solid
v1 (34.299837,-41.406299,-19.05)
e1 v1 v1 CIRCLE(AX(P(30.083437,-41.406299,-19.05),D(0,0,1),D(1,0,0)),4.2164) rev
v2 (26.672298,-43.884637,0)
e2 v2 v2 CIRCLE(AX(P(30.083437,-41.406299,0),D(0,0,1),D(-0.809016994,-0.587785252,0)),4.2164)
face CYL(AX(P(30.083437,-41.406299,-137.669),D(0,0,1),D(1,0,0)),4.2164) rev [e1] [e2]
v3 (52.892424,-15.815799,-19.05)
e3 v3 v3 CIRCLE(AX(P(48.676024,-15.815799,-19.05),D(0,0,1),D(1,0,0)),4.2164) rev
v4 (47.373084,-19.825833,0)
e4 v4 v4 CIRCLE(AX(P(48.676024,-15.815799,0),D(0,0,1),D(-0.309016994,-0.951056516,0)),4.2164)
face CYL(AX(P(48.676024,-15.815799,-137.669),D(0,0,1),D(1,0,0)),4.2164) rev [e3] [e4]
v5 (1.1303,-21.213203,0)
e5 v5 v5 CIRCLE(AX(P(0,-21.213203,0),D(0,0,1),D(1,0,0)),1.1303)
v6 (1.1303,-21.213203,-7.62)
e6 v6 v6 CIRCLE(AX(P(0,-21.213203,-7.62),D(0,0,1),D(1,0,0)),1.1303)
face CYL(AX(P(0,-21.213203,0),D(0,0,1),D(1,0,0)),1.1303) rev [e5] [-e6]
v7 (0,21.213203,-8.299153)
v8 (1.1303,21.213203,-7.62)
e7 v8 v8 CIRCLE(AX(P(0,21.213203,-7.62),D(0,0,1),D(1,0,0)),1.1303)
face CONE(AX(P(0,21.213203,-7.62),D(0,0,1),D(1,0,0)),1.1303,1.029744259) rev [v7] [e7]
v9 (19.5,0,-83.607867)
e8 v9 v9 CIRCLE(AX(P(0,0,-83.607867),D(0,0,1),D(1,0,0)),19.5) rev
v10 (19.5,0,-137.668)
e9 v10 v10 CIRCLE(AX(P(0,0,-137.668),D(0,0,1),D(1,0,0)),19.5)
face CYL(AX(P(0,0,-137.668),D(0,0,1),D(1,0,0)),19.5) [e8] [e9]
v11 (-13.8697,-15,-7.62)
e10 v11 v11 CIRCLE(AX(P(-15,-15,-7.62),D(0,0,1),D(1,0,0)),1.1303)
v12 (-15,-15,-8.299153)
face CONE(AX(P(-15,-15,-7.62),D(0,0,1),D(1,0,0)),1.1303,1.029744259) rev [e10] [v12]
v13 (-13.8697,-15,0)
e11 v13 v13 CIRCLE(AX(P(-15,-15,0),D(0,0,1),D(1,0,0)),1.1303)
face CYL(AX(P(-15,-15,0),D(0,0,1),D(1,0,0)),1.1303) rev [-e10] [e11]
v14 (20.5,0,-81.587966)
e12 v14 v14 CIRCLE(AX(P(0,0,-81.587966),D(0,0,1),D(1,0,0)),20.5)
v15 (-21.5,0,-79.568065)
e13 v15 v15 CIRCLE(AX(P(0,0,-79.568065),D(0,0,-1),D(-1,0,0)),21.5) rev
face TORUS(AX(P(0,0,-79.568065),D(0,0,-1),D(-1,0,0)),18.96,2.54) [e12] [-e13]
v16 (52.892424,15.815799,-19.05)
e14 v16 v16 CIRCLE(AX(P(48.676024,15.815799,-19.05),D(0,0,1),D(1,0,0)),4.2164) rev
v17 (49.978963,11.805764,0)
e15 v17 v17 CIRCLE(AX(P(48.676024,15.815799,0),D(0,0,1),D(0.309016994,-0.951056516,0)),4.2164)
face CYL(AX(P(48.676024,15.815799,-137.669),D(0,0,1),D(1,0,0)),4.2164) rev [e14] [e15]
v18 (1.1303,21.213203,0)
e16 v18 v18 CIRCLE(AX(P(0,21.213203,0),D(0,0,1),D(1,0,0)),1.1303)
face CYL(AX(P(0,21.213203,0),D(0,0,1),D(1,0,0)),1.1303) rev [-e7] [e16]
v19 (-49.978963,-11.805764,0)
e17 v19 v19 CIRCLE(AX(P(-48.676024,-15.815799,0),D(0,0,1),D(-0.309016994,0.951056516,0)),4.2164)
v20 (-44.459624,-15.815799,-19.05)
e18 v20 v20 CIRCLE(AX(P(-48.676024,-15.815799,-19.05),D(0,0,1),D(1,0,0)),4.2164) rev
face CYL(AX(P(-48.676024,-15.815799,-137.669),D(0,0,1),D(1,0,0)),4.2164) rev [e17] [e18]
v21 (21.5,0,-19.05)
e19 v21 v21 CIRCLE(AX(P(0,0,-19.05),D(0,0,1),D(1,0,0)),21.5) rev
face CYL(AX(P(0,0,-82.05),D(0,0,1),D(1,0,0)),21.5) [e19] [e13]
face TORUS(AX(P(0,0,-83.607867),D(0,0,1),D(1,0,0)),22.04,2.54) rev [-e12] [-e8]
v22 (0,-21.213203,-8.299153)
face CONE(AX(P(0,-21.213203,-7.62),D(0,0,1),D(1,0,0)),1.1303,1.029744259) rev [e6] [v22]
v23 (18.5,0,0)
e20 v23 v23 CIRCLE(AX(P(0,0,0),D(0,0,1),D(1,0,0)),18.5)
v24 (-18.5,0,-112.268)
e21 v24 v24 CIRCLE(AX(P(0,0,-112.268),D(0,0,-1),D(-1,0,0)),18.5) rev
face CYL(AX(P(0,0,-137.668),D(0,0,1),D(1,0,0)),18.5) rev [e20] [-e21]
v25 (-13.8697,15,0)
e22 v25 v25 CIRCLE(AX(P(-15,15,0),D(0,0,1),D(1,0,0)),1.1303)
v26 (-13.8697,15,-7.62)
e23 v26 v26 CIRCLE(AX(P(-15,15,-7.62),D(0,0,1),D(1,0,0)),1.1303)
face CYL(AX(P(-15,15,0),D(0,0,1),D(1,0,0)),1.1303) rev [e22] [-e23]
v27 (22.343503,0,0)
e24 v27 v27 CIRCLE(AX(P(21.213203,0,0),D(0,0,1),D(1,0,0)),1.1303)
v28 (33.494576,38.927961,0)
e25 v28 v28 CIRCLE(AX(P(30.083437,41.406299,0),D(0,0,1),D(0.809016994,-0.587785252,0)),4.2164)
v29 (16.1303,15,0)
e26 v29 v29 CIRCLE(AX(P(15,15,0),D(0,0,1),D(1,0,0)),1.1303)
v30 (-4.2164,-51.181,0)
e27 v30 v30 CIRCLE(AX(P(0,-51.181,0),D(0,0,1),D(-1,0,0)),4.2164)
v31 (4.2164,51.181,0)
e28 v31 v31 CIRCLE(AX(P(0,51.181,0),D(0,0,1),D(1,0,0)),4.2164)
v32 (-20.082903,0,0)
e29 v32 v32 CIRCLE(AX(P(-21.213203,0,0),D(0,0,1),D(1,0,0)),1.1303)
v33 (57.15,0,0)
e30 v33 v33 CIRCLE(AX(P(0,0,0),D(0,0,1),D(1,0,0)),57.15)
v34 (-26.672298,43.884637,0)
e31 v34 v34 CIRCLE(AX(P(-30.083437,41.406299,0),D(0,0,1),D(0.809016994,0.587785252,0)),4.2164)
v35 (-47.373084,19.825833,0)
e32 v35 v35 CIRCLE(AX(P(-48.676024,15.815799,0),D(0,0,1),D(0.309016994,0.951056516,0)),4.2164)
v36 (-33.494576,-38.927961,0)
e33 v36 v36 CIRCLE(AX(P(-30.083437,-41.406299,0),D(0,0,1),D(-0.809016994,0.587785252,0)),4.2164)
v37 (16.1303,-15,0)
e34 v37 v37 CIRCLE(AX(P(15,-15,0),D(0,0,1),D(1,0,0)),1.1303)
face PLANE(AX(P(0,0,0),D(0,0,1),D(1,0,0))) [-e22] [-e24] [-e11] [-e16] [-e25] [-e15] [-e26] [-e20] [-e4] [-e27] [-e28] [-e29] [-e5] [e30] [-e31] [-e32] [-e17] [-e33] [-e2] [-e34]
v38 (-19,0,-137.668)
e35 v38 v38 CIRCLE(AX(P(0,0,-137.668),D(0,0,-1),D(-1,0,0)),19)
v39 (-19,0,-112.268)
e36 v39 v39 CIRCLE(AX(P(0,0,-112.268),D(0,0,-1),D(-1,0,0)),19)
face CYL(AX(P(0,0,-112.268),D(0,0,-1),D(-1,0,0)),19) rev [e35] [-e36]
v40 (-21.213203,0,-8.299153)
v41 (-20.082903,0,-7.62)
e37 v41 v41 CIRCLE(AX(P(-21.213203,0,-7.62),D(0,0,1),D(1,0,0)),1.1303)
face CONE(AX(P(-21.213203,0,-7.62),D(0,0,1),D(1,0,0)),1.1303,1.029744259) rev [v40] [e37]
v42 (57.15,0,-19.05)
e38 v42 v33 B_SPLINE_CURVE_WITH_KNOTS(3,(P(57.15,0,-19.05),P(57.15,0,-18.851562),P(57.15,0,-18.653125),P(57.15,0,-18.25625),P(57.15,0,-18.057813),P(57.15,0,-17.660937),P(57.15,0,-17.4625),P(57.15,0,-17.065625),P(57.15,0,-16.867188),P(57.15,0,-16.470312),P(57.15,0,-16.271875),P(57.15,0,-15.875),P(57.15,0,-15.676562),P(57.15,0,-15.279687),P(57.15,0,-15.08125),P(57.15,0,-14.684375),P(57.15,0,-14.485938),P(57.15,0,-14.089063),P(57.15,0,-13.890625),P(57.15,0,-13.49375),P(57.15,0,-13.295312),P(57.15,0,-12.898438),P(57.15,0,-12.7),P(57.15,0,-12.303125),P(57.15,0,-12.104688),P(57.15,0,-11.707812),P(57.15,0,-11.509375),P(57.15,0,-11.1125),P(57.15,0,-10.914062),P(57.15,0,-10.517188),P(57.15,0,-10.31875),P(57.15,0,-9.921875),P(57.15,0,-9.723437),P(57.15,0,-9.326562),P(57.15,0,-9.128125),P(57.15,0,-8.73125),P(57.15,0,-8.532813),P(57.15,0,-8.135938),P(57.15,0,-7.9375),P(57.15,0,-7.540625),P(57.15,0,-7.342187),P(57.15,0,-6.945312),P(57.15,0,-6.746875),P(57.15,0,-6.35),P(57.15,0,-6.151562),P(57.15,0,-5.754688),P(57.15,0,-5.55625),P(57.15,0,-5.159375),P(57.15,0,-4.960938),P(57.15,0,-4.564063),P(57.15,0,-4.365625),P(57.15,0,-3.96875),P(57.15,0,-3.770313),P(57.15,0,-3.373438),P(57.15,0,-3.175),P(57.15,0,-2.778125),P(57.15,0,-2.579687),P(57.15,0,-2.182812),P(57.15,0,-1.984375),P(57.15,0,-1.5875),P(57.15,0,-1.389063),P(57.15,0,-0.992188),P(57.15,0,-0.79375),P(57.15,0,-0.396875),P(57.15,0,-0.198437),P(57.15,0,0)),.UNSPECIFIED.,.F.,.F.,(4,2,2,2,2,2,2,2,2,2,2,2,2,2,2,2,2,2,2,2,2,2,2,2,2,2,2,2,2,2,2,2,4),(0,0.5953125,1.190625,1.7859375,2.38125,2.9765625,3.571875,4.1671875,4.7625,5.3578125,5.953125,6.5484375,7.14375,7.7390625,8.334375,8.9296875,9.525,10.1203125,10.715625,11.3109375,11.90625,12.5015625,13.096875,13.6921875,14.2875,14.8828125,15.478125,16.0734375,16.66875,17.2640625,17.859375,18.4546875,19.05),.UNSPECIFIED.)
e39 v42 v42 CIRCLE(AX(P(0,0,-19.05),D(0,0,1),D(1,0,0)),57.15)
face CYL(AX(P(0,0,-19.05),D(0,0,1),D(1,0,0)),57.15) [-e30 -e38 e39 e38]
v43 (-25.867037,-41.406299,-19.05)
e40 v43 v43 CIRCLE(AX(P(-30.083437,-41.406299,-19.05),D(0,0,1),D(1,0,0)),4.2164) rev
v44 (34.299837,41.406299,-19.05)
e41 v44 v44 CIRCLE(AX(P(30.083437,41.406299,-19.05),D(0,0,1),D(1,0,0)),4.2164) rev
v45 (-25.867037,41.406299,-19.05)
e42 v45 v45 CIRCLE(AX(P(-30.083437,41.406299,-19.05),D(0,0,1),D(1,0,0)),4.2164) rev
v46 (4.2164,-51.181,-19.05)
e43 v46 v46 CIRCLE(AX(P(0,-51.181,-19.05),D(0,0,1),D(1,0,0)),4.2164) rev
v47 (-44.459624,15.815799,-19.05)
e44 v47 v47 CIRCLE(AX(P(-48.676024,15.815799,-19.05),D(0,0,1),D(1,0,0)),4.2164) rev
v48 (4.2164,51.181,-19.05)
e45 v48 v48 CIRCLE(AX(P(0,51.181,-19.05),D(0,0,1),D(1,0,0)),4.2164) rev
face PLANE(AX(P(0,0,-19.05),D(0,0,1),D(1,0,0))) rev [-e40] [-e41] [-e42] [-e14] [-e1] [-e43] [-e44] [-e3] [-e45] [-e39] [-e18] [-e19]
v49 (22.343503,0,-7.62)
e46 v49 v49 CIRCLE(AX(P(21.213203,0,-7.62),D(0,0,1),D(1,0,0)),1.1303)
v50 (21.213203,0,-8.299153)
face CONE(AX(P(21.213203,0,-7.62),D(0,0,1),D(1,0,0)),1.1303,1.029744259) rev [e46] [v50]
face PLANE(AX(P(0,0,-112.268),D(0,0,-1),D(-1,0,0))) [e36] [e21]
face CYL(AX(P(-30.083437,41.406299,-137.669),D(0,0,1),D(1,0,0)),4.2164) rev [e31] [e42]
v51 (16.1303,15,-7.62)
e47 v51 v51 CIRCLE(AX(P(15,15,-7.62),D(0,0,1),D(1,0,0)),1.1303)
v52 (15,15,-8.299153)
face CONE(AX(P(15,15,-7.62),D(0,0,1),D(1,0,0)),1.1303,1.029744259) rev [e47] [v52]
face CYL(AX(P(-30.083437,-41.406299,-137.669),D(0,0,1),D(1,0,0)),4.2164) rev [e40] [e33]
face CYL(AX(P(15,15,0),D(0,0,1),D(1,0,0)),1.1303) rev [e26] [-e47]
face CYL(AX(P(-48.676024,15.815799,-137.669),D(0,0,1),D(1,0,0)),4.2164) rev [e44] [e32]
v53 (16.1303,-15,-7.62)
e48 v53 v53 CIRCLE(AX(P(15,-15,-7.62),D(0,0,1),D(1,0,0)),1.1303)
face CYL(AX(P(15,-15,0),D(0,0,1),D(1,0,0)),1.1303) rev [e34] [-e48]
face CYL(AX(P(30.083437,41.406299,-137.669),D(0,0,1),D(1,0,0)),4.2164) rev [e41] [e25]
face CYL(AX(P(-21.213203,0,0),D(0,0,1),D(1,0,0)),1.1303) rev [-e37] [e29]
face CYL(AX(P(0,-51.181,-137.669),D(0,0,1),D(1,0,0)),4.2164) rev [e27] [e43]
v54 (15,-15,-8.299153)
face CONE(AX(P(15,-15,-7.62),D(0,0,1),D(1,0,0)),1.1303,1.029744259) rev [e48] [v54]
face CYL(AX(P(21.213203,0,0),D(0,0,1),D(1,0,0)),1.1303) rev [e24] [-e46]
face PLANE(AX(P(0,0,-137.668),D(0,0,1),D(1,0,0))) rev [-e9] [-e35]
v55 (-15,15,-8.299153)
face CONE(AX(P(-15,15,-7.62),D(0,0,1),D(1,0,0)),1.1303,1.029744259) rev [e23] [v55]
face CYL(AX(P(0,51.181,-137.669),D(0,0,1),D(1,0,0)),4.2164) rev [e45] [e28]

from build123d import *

# Parameters (mm, degrees)
SKETCH1_R                 = 19.5
SKETCH1_R_2               = 18.5
EXTRUDE1_DEPTH            = 137.668
SKETCH4_R                 = 57.15
SKETCH4_R_2               = 19.5
EXTRUDE2_DEPTH            = 19.05
CUT_EXTRUDE1_REACH        = 161.639
SKETCH5_R                 = 4.2164
CIRPATTERN1_COUNT         = 10
F_4_40_TAPPED_HOLE2_D     = 2.2606
F_4_40_TAPPED_HOLE2_DEPTH = 7.62
F_4_40_TAPPED_HOLE2_TIP   = 0.679152758
SKETCH10_R                = 19
EXTRUDE3_DEPTH            = 25.4
EXTRUDE4_START            = 63
SKETCH12_R                = 21.5
SKETCH12_R_2              = 19
EXTRUDE4_DEPTH            = 63
FILLET1_R                 = 2.54
FILLET2_R                 = 2.54


with BuildPart() as part:
    # Sketch1 → Extrude1 (new body)
    with BuildSketch(Plane.XY):
        Circle(SKETCH1_R)
        Circle(SKETCH1_R_2, mode=Mode.SUBTRACT)
    extrude(amount=-EXTRUDE1_DEPTH)

    # Sketch4 → Extrude2 (add)
    with BuildSketch(Plane.XY):
        Circle(SKETCH4_R)
        Circle(SKETCH4_R_2, mode=Mode.SUBTRACT)
    extrude(amount=-EXTRUDE2_DEPTH)

    # Sketch5 → Cut-Extrude1 (cut, up to next)
    with BuildSketch(Plane.XY, mode=Mode.PRIVATE) as cut_extrude1_sk1:
        with Locations((0, 51.181)):
            Circle(SKETCH5_R)
    cut_extrude1_tool1 = extrude(cut_extrude1_sk1.sketch, amount=-CUT_EXTRUDE1_REACH, mode=Mode.PRIVATE) & part.part
    cut_extrude1 = cut_extrude1_tool1.solids().sort_by_distance((0, 51.181, 0))[0]
    add(cut_extrude1, mode=Mode.SUBTRACT)

    # CirPattern1: Cut-Extrude1 ×10 about axis
    cirpattern1_axis = Axis((0, 0, 0), (0, 0, 1))
    for i in range(1, CIRPATTERN1_COUNT):
        add(cut_extrude1.rotate(cirpattern1_axis, i * 360 / CIRPATTERN1_COUNT), mode=Mode.SUBTRACT)

    # #4-40 Tapped Hole2
    with Locations(Plane.XY):
        with Locations((15, -15), (-15, -15), (-15, 15), (15, 15), (0, 21.213203436), (-21.213203436, 0), (21.213203436, 0), (0, -21.213203436)):
            Hole(F_4_40_TAPPED_HOLE2_D / 2, depth=F_4_40_TAPPED_HOLE2_DEPTH)
            with Locations((0, 0, -(F_4_40_TAPPED_HOLE2_DEPTH + F_4_40_TAPPED_HOLE2_TIP / 2))):  # 118° drill point
                Cone(0, F_4_40_TAPPED_HOLE2_D / 2, F_4_40_TAPPED_HOLE2_TIP, mode=Mode.SUBTRACT)

    # Sketch10 → Extrude3 (cut)
    with BuildSketch(Plane(origin=(0, 0, -137.668), x_dir=(-1, 0, 0), z_dir=(0, 0, -1))):
        Circle(SKETCH10_R)
    extrude(amount=-EXTRUDE3_DEPTH, mode=Mode.SUBTRACT)

    # Sketch12 → Extrude4 (add)
    with BuildSketch(Plane(origin=(0, 0, -19.05), x_dir=(-1, 0, 0), z_dir=(0, 0, -1)).offset(EXTRUDE4_START)):
        with Locations(Location((0, 0, 0), (0, 0, 180))):
            Circle(SKETCH12_R)
        Circle(SKETCH12_R_2, mode=Mode.SUBTRACT)
    extrude(amount=-EXTRUDE4_DEPTH)

    # Fillet1
    # the kernel refuses this fillet: 2.54 mm, written as the material it takes off along each edge
    with BuildSketch(Plane(origin=(0, 0, -82.05), x_dir=(1, 0, 0), z_dir=(0, 1, 0))) as fillet1_piece_1:
        with BuildLine():
            CenterArc((18.96, -2.481934729), FILLET1_R, 0, 77.725329785)
            Line((21.5, -2.481934729), (21.5508, -2.481934729))
            Line((21.5508, -2.481934729), (21.5508, 0))
            Line((21.5508, 0), (21.5, 0.0508))
            ThreePointArc((21.5, 0.0508), (20.5, 0.0508), (19.5108, 0.049638695))
            Line((19.5108, 0.049638695), (19.5, 0))
        make_face()
    revolve(axis=Axis((0, 0, -82.05), (0, 0, -1)), mode=Mode.SUBTRACT)

    # Fillet2
    fillet2_edges = [part.edges().sort_by_distance(p)[0] for p in [
        (-19.5, 0, -82.05),
    ]]
    fillet(fillet2_edges, radius=FILLET2_R)


solid = part.part
